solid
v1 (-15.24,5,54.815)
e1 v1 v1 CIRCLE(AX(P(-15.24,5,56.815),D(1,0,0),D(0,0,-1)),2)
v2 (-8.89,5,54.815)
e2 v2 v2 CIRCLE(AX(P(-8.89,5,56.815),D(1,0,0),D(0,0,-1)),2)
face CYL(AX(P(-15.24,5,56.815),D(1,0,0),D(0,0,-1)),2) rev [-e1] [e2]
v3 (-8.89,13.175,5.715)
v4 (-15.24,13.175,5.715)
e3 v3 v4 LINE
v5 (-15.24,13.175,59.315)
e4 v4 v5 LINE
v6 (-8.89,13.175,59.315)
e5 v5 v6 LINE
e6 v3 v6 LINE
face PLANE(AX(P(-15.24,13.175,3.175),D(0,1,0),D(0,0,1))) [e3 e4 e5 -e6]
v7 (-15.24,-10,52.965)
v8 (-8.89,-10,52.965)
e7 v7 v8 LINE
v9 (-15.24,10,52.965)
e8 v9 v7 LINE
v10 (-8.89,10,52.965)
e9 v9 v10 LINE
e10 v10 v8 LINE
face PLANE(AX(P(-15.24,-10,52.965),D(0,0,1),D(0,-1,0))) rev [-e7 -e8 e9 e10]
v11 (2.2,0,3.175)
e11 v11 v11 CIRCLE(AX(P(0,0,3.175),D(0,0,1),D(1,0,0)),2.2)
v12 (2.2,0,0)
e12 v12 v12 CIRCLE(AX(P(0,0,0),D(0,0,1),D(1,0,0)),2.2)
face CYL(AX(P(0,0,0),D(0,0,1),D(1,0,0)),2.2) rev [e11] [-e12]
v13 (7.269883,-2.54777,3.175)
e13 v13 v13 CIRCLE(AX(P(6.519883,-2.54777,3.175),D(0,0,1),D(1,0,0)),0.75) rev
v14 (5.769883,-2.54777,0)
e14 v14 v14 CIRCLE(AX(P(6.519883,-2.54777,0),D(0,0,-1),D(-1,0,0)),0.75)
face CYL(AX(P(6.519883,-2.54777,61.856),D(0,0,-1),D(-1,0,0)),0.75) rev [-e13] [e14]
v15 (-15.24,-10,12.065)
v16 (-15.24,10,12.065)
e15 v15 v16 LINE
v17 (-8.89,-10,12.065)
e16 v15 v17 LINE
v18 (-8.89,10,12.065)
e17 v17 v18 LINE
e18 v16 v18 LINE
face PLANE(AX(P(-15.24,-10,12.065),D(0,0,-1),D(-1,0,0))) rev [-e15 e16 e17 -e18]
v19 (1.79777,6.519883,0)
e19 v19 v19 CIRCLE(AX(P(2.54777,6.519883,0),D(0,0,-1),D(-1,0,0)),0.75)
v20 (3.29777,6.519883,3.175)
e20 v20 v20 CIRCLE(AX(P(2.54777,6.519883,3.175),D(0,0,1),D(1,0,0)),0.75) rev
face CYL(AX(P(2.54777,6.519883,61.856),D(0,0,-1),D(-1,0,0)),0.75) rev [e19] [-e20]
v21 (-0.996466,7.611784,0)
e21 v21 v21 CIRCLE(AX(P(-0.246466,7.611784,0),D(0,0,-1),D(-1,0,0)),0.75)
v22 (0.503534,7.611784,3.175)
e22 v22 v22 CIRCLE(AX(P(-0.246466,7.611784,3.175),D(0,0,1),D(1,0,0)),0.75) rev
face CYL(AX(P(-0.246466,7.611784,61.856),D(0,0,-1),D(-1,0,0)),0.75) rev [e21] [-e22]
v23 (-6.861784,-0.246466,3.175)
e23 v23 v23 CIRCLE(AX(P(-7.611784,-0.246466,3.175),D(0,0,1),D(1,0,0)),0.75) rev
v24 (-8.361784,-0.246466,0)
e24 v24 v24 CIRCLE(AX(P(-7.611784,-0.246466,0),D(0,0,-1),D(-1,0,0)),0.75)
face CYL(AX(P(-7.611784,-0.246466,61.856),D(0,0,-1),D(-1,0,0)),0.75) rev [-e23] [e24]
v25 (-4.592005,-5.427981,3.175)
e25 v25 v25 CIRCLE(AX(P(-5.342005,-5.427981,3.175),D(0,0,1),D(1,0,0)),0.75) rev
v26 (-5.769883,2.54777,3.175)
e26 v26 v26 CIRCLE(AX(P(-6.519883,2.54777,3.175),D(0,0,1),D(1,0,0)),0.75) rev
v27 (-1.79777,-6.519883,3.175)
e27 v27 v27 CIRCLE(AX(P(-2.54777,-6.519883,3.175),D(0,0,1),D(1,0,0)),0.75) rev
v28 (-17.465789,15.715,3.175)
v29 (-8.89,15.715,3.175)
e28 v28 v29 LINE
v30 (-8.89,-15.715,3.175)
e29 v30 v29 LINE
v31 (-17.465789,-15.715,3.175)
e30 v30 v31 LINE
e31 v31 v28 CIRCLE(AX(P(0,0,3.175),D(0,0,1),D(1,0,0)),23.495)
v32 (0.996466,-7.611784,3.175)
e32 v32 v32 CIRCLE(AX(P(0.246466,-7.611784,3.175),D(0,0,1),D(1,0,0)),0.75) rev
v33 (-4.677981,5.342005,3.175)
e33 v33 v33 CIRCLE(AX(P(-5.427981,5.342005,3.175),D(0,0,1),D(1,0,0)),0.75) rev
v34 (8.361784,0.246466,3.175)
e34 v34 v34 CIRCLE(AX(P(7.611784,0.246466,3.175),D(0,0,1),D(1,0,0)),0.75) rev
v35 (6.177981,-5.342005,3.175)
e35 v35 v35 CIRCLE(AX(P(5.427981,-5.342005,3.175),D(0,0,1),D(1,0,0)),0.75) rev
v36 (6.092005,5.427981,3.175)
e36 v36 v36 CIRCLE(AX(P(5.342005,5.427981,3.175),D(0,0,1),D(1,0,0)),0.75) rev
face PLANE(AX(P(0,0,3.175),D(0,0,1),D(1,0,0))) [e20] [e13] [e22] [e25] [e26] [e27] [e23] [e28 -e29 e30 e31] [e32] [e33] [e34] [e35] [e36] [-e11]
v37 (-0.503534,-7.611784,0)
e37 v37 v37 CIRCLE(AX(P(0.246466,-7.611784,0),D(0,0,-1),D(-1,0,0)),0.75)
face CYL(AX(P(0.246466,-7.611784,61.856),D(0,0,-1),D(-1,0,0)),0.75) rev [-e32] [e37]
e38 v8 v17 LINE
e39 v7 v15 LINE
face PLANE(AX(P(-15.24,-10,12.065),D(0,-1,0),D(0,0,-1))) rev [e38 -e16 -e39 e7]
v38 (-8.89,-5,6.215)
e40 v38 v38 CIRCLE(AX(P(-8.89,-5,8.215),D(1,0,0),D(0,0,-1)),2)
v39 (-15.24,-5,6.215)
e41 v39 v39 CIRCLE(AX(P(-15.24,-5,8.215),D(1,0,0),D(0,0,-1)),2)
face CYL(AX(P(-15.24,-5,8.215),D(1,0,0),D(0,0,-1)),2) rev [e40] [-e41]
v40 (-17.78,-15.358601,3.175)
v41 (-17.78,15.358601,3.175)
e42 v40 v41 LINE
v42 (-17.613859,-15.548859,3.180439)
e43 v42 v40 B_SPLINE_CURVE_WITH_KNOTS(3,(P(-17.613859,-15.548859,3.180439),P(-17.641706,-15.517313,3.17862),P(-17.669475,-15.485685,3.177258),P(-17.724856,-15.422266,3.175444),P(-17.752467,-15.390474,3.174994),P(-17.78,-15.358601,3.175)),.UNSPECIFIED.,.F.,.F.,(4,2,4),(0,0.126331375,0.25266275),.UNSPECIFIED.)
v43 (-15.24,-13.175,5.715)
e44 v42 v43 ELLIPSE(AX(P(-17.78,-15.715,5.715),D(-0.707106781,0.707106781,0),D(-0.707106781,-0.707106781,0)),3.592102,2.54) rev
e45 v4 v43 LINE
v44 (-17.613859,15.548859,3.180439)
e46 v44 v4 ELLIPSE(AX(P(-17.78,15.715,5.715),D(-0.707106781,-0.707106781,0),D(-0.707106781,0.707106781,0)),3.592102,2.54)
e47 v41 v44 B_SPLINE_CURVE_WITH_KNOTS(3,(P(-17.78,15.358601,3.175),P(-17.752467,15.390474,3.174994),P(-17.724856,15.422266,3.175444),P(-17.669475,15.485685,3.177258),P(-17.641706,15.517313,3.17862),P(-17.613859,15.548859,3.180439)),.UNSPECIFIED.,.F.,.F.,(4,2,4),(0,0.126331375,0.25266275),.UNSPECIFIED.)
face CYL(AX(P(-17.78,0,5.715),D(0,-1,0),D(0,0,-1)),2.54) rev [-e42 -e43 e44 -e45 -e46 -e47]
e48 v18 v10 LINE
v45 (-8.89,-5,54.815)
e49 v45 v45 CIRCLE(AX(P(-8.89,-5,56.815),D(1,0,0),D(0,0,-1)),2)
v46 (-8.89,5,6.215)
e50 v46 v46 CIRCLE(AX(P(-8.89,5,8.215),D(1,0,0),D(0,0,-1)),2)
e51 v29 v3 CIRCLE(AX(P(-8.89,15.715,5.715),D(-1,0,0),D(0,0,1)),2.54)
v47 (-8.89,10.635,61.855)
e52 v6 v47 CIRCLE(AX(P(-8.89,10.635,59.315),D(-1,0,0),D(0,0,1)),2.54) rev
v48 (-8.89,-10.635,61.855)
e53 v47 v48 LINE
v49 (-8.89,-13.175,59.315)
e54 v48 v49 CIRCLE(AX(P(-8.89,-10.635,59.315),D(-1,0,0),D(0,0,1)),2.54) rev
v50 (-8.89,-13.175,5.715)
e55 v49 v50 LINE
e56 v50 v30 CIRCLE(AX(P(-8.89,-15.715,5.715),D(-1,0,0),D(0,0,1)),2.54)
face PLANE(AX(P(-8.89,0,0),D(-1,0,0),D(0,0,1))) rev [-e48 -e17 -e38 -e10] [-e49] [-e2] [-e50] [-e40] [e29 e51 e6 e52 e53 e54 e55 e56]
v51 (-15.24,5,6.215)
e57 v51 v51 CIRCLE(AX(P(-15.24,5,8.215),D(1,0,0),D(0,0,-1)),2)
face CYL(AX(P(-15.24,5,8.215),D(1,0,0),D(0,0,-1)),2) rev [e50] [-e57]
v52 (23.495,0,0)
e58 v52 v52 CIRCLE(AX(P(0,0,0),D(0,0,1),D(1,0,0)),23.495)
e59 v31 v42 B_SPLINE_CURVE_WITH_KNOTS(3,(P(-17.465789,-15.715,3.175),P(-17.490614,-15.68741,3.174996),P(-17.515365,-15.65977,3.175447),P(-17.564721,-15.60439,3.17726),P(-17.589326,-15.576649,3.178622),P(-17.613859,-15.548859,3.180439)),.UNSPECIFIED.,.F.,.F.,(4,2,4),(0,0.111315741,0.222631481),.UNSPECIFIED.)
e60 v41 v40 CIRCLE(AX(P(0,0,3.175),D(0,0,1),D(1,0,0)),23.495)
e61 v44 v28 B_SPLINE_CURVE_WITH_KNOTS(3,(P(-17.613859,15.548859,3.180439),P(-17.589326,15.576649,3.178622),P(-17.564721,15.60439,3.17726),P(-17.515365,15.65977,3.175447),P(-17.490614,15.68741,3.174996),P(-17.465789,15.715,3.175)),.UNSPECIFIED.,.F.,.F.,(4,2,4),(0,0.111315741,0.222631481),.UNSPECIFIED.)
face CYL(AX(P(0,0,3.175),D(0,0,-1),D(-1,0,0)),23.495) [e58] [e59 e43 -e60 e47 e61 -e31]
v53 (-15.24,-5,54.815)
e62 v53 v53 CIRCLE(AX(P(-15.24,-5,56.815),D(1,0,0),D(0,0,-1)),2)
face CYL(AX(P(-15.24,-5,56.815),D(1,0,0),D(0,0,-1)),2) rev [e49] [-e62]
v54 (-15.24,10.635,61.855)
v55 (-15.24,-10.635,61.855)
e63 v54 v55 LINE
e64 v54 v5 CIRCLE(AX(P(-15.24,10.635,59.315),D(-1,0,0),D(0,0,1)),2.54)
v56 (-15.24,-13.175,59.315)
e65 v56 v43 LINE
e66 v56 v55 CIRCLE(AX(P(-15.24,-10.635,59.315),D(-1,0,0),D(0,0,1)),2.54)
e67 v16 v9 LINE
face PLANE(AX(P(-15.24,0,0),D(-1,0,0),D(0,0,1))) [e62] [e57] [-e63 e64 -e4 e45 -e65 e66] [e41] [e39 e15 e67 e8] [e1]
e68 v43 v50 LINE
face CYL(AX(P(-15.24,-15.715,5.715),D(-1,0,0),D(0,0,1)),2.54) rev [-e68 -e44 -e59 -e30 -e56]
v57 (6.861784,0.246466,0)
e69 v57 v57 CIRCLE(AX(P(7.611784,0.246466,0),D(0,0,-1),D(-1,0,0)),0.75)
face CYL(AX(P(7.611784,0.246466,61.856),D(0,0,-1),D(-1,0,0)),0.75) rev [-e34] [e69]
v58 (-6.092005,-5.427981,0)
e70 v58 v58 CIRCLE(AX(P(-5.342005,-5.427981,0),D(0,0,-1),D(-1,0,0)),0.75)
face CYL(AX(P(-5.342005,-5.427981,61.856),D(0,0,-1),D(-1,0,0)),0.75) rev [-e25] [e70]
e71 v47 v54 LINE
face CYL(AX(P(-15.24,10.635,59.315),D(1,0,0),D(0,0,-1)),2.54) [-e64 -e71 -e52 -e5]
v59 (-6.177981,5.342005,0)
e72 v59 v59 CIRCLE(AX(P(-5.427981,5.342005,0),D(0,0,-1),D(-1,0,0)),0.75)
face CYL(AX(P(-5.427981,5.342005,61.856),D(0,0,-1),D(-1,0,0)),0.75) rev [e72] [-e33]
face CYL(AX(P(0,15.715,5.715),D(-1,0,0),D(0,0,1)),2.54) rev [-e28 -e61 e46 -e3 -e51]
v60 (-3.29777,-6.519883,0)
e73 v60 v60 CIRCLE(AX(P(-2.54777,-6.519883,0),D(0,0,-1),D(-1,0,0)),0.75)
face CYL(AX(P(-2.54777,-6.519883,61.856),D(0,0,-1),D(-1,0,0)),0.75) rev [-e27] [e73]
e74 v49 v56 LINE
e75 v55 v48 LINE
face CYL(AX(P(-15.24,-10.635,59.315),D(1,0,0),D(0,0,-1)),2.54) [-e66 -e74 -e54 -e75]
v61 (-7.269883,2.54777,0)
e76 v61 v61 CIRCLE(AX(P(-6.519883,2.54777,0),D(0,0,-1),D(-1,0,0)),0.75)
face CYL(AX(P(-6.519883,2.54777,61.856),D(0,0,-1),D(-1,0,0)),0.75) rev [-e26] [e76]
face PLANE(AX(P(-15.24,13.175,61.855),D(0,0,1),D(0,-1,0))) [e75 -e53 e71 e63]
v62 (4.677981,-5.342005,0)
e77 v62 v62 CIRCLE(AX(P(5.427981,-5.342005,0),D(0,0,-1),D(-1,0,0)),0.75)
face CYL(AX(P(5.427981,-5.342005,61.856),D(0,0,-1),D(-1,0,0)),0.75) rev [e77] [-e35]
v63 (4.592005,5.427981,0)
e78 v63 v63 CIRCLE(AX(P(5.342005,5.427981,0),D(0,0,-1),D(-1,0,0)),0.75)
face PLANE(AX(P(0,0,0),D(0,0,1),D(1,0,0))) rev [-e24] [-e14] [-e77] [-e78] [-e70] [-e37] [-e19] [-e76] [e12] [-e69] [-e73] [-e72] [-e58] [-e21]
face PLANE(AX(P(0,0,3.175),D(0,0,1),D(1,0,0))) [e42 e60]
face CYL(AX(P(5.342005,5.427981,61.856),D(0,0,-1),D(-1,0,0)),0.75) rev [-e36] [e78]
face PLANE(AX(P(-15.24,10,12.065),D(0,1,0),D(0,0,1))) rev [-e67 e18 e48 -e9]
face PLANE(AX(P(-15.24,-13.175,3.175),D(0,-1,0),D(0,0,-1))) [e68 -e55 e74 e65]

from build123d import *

# Parameters (mm, degrees)
SKETCH1_R           = 23.495
BOSS_EXTRUDE1_DEPTH = 3.175
SKETCH4_W           = 58.68
SKETCH4_H           = 26.35
SKETCH4_R           = 2
SKETCH4_W_2         = 40.9
SKETCH4_H_2         = 20
BOSS_EXTRUDE3_DEPTH = 6.35
FILLET1_R           = 2.54
CUT_EXTRUDE1_REACH  = 72.214
SKETCH5_R           = 0.75
SKETCH5_R_2         = 1.5
SKETCH6_R           = 2.2
CUT_EXTRUDE2_DEPTH  = 68.434208377
FILLET2_R           = 2.54


with BuildPart() as part:
    # Sketch1 → Boss-Extrude1 (new body)
    with BuildSketch(Plane.XY):
        Circle(SKETCH1_R)
    extrude(amount=BOSS_EXTRUDE1_DEPTH)

    # Sketch4 → Boss-Extrude3 (add)
    with BuildSketch(Plane(origin=(-8.89, 0, 0), x_dir=(0, 0, -1), z_dir=(1, 0, 0))):
        with Locations((-32.515, 0)):
            Rectangle(SKETCH4_W, SKETCH4_H)
        with Locations((-56.815, -5)):
            Circle(SKETCH4_R, mode=Mode.SUBTRACT)
        with Locations((-56.815, 5)):
            Circle(SKETCH4_R, mode=Mode.SUBTRACT)
        with Locations((-8.215, -5)):
            Circle(SKETCH4_R, mode=Mode.SUBTRACT)
        with Locations((-8.215, 5)):
            Circle(SKETCH4_R, mode=Mode.SUBTRACT)
        with Locations((-32.515, 0)):
            Rectangle(SKETCH4_W_2, SKETCH4_H_2, mode=Mode.SUBTRACT)
    extrude(amount=-BOSS_EXTRUDE3_DEPTH)

    # Fillet1
    # the kernel refuses this fillet: 2.54 mm, written as the material it adds along each edge
    with BuildSketch(Plane(origin=(-15.24, -13.175, 3.175), x_dir=(-1, 0, 0), z_dir=(0, 1, 0))) as fillet1_piece_1:
        with BuildLine():
            CenterArc((FILLET1_R, FILLET1_R), FILLET1_R, 180, 90)
            Line((0, FILLET1_R), (0, 0))
            Line((0, 0), (FILLET1_R, 0))
        make_face()
    extrude(amount=26.35)
    with BuildSketch(Plane(origin=(-8.89, 13.175, 3.175), x_dir=(0, 1, 0), z_dir=(-1, 0, 0))) as fillet1_piece_2:
        with BuildLine():
            CenterArc((FILLET1_R, -FILLET1_R), FILLET1_R, 90, 90)
            Line((0, -FILLET1_R), (0, 0))
            Line((0, 0), (FILLET1_R, 0))
        make_face()
    extrude(amount=6.35)
    with BuildSketch(Plane(origin=(-8.89, -13.175, 3.175), x_dir=(0, -1, 0), z_dir=(-1, 0, 0))) as fillet1_piece_3:
        with BuildLine():
            CenterArc((FILLET1_R, FILLET1_R), FILLET1_R, 180, 90)
            Line((0, FILLET1_R), (0, 0))
            Line((0, 0), (FILLET1_R, 0))
        make_face()
    extrude(amount=6.35)
    with BuildSketch(Plane(origin=(-15.24, -19.525, 3.175), x_dir=(-1, 0, 0), z_dir=(0, 1, 0))) as fillet1_piece_4a_section:
        with BuildLine():
            CenterArc((FILLET1_R, FILLET1_R), FILLET1_R, 180, 90)
            Line((0, FILLET1_R), (0, 0))
            Line((0, 0), (FILLET1_R, 0))
        make_face()
    fillet1_piece_4a = extrude(amount=32.7, mode=Mode.PRIVATE)
    fillet1_piece_4a = fillet1_piece_4a & Plane(origin=(0, 0, 3.789458471), x_dir=(1, 0, 0), z_dir=(0, 0, -1)) * Cylinder(23.495, 76, mode=Mode.PRIVATE)
    fillet1_piece_4a = split(fillet1_piece_4a, bisect_by=Plane(origin=(-15.747234341, -13.175, 3.789458471), z_dir=(0, -1, 0)), keep=Keep.TOP, mode=Mode.PRIVATE)
    with BuildSketch(Plane(origin=(-8.89, -13.175, 3.175), x_dir=(0, -1, 0), z_dir=(-1, 0, 0))) as fillet1_piece_4b_section:
        with BuildLine():
            CenterArc((FILLET1_R, FILLET1_R), FILLET1_R, 180, 90)
            Line((0, FILLET1_R), (0, 0))
            Line((0, 0), (FILLET1_R, 0))
        make_face()
    fillet1_piece_4b = extrude(amount=12.7, mode=Mode.PRIVATE)
    fillet1_piece_4b = fillet1_piece_4b & Plane(origin=(0, 0, 3.784403855), x_dir=(1, 0, 0), z_dir=(0, 0, -1)) * Cylinder(23.495, 36, mode=Mode.PRIVATE)
    fillet1_piece_4b = split(fillet1_piece_4b, bisect_by=Plane(origin=(-15.24, -13.690986617, 3.784403855), z_dir=(-1, 0, 0)), keep=Keep.TOP, mode=Mode.PRIVATE)
    fillet1_piece_4 = fillet1_piece_4a & fillet1_piece_4b
    add(fillet1_piece_4)
    with BuildSketch(Plane(origin=(-8.89, 13.175, 3.175), x_dir=(0, 1, 0), z_dir=(-1, 0, 0))) as fillet1_piece_5a_section:
        with BuildLine():
            CenterArc((FILLET1_R, -FILLET1_R), FILLET1_R, 90, 90)
            Line((0, -FILLET1_R), (0, 0))
            Line((0, 0), (FILLET1_R, 0))
        make_face()
    fillet1_piece_5a = extrude(amount=12.7, mode=Mode.PRIVATE)
    fillet1_piece_5a = fillet1_piece_5a & Plane(origin=(0, 0, 3.784403835), x_dir=(1, 0, 0), z_dir=(0, 0, -1)) * Cylinder(23.495, 36, mode=Mode.PRIVATE)
    fillet1_piece_5a = split(fillet1_piece_5a, bisect_by=Plane(origin=(-15.24, 13.69098675, 3.784403835), z_dir=(-1, 0, 0)), keep=Keep.TOP, mode=Mode.PRIVATE)
    with BuildSketch(Plane(origin=(-15.24, -13.175, 3.175), x_dir=(-1, 0, 0), z_dir=(0, 1, 0))) as fillet1_piece_5b_section:
        with BuildLine():
            CenterArc((FILLET1_R, FILLET1_R), FILLET1_R, 180, 90)
            Line((0, FILLET1_R), (0, 0))
            Line((0, 0), (FILLET1_R, 0))
        make_face()
    fillet1_piece_5b = extrude(amount=32.7, mode=Mode.PRIVATE)
    fillet1_piece_5b = fillet1_piece_5b & Plane(origin=(0, 0, 3.789458493), x_dir=(1, 0, 0), z_dir=(0, 0, -1)) * Cylinder(23.495, 76, mode=Mode.PRIVATE)
    fillet1_piece_5b = split(fillet1_piece_5b, bisect_by=Plane(origin=(-15.747234214, 13.175, 3.789458493), z_dir=(0, 1, 0)), keep=Keep.TOP, mode=Mode.PRIVATE)
    fillet1_piece_5 = fillet1_piece_5a & fillet1_piece_5b
    add(fillet1_piece_5)

    # Sketch5 → Cut-Extrude1 (cut, up to next)
    with BuildSketch(Plane(origin=(0, 0, 0), x_dir=(-1, 0, 0), z_dir=(0, 0, -1)), mode=Mode.PRIVATE) as cut_extrude1_sk1:
        with Locations((5.342004985, -5.427981461)):
            Circle(SKETCH5_R)
    cut_extrude1_tool1 = extrude(cut_extrude1_sk1.sketch, amount=-CUT_EXTRUDE1_REACH, mode=Mode.PRIVATE) & part.part
    # Sketch5 → Cut-Extrude1 (cut, up to next)
    with BuildSketch(Plane(origin=(0, 0, 0), x_dir=(-1, 0, 0), z_dir=(0, 0, -1)), mode=Mode.PRIVATE) as cut_extrude1_sk2:
        with Locations((2.547769545, -6.519882694)):
            Circle(SKETCH5_R)
    cut_extrude1_tool2 = extrude(cut_extrude1_sk2.sketch, amount=-CUT_EXTRUDE1_REACH, mode=Mode.PRIVATE) & part.part
    # Sketch5 → Cut-Extrude1 (cut, up to next)
    with BuildSketch(Plane(origin=(0, 0, 0), x_dir=(-1, 0, 0), z_dir=(0, 0, -1)), mode=Mode.PRIVATE) as cut_extrude1_sk3:
        with Locations((-0.246465895, -7.611783928)):
            Circle(SKETCH5_R)
    cut_extrude1_tool3 = extrude(cut_extrude1_sk3.sketch, amount=-CUT_EXTRUDE1_REACH, mode=Mode.PRIVATE) & part.part
    # Sketch5 → Cut-Extrude1 (cut, up to next)
    with BuildSketch(Plane(origin=(0, 0, 0), x_dir=(-1, 0, 0), z_dir=(0, 0, -1)), mode=Mode.PRIVATE) as cut_extrude1_sk4:
        with Locations((-5.427981461, -5.342004985)):
            Circle(SKETCH5_R)
    cut_extrude1_tool4 = extrude(cut_extrude1_sk4.sketch, amount=-CUT_EXTRUDE1_REACH, mode=Mode.PRIVATE) & part.part
    # Sketch5 → Cut-Extrude1 (cut, up to next)
    with BuildSketch(Plane(origin=(0, 0, 0), x_dir=(-1, 0, 0), z_dir=(0, 0, -1)), mode=Mode.PRIVATE) as cut_extrude1_sk5:
        with Locations((-6.519882694, -2.547769545)):
            Circle(SKETCH5_R)
    cut_extrude1_tool5 = extrude(cut_extrude1_sk5.sketch, amount=-CUT_EXTRUDE1_REACH, mode=Mode.PRIVATE) & part.part
    # Sketch5 → Cut-Extrude1 (cut, up to next)
    with BuildSketch(Plane(origin=(0, 0, 0), x_dir=(-1, 0, 0), z_dir=(0, 0, -1)), mode=Mode.PRIVATE) as cut_extrude1_sk6:
        with Locations((-7.611783928, 0.246465895)):
            Circle(SKETCH5_R)
    cut_extrude1_tool6 = extrude(cut_extrude1_sk6.sketch, amount=-CUT_EXTRUDE1_REACH, mode=Mode.PRIVATE) & part.part
    # Sketch5 → Cut-Extrude1 (cut, up to next)
    with BuildSketch(Plane(origin=(0, 0, 0), x_dir=(-1, 0, 0), z_dir=(0, 0, -1)), mode=Mode.PRIVATE) as cut_extrude1_sk7:
        with Locations((-5.342004985, 5.427981461)):
            Circle(SKETCH5_R)
    cut_extrude1_tool7 = extrude(cut_extrude1_sk7.sketch, amount=-CUT_EXTRUDE1_REACH, mode=Mode.PRIVATE) & part.part
    # Sketch5 → Cut-Extrude1 (cut, up to next)
    with BuildSketch(Plane(origin=(0, 0, 0), x_dir=(-1, 0, 0), z_dir=(0, 0, -1)), mode=Mode.PRIVATE) as cut_extrude1_sk8:
        with Locations((-2.547769545, 6.519882694)):
            Circle(SKETCH5_R)
    cut_extrude1_tool8 = extrude(cut_extrude1_sk8.sketch, amount=-CUT_EXTRUDE1_REACH, mode=Mode.PRIVATE) & part.part
    # Sketch5 → Cut-Extrude1 (cut, up to next)
    with BuildSketch(Plane(origin=(0, 0, 0), x_dir=(-1, 0, 0), z_dir=(0, 0, -1)), mode=Mode.PRIVATE) as cut_extrude1_sk9:
        with Locations((0.246465895, 7.611783928)):
            Circle(SKETCH5_R)
    cut_extrude1_tool9 = extrude(cut_extrude1_sk9.sketch, amount=-CUT_EXTRUDE1_REACH, mode=Mode.PRIVATE) & part.part
    # Sketch5 → Cut-Extrude1 (cut, up to next)
    with BuildSketch(Plane(origin=(0, 0, 0), x_dir=(-1, 0, 0), z_dir=(0, 0, -1)), mode=Mode.PRIVATE) as cut_extrude1_sk10:
        with Locations((5.427981461, 5.342004985)):
            Circle(SKETCH5_R)
    cut_extrude1_tool10 = extrude(cut_extrude1_sk10.sketch, amount=-CUT_EXTRUDE1_REACH, mode=Mode.PRIVATE) & part.part
    # Sketch5 → Cut-Extrude1 (cut, up to next)
    with BuildSketch(Plane(origin=(0, 0, 0), x_dir=(-1, 0, 0), z_dir=(0, 0, -1)), mode=Mode.PRIVATE) as cut_extrude1_sk11:
        with Locations((6.519882694, 2.547769545)):
            Circle(SKETCH5_R)
    cut_extrude1_tool11 = extrude(cut_extrude1_sk11.sketch, amount=-CUT_EXTRUDE1_REACH, mode=Mode.PRIVATE) & part.part
    # Sketch5 → Cut-Extrude1 (cut, up to next)
    with BuildSketch(Plane(origin=(0, 0, 0), x_dir=(-1, 0, 0), z_dir=(0, 0, -1)), mode=Mode.PRIVATE) as cut_extrude1_sk12:
        with Locations((7.611783928, -0.246465895)):
            Circle(SKETCH5_R)
    cut_extrude1_tool12 = extrude(cut_extrude1_sk12.sketch, amount=-CUT_EXTRUDE1_REACH, mode=Mode.PRIVATE) & part.part
    # Sketch5 → Cut-Extrude1 (cut, up to next)
    with BuildSketch(Plane(origin=(0, 0, 0), x_dir=(-1, 0, 0), z_dir=(0, 0, -1)), mode=Mode.PRIVATE) as cut_extrude1_sk13:
        Circle(SKETCH5_R_2)
    cut_extrude1_tool13 = extrude(cut_extrude1_sk13.sketch, amount=-CUT_EXTRUDE1_REACH, mode=Mode.PRIVATE) & part.part
    add(cut_extrude1_tool1.solids().sort_by_distance((-5.342005, -5.427981, 0))[0], mode=Mode.SUBTRACT)
    add(cut_extrude1_tool2.solids().sort_by_distance((-2.54777, -6.519883, 0))[0], mode=Mode.SUBTRACT)
    add(cut_extrude1_tool3.solids().sort_by_distance((0.246466, -7.611784, 0))[0], mode=Mode.SUBTRACT)
    add(cut_extrude1_tool4.solids().sort_by_distance((5.427981, -5.342005, 0))[0], mode=Mode.SUBTRACT)
    add(cut_extrude1_tool5.solids().sort_by_distance((6.519883, -2.54777, 0))[0], mode=Mode.SUBTRACT)
    add(cut_extrude1_tool6.solids().sort_by_distance((7.611784, 0.246466, 0))[0], mode=Mode.SUBTRACT)
    add(cut_extrude1_tool7.solids().sort_by_distance((5.342005, 5.427981, 0))[0], mode=Mode.SUBTRACT)
    add(cut_extrude1_tool8.solids().sort_by_distance((2.54777, 6.519883, 0))[0], mode=Mode.SUBTRACT)
    add(cut_extrude1_tool9.solids().sort_by_distance((-0.246466, 7.611784, 0))[0], mode=Mode.SUBTRACT)
    add(cut_extrude1_tool10.solids().sort_by_distance((-5.427981, 5.342005, 0))[0], mode=Mode.SUBTRACT)
    add(cut_extrude1_tool11.solids().sort_by_distance((-6.519883, 2.54777, 0))[0], mode=Mode.SUBTRACT)
    add(cut_extrude1_tool12.solids().sort_by_distance((-7.611784, -0.246466, 0))[0], mode=Mode.SUBTRACT)
    add(cut_extrude1_tool13.solids().sort_by_distance((0, 0, 0))[0], mode=Mode.SUBTRACT)

    # Sketch6 → Cut-Extrude2 (cut, through all)
    with BuildSketch(Plane.XY.offset(3.175)):
        Circle(SKETCH6_R)
    extrude(amount=-CUT_EXTRUDE2_DEPTH, mode=Mode.SUBTRACT)

    # Fillet2
    fillet2_edges = [part.edges().sort_by_distance(p)[0] for p in [
        (-12.065, -13.175, 61.855),
        (-12.065, 13.175, 61.855),
    ]]
    fillet(fillet2_edges, radius=FILLET2_R)


solid = part.part
